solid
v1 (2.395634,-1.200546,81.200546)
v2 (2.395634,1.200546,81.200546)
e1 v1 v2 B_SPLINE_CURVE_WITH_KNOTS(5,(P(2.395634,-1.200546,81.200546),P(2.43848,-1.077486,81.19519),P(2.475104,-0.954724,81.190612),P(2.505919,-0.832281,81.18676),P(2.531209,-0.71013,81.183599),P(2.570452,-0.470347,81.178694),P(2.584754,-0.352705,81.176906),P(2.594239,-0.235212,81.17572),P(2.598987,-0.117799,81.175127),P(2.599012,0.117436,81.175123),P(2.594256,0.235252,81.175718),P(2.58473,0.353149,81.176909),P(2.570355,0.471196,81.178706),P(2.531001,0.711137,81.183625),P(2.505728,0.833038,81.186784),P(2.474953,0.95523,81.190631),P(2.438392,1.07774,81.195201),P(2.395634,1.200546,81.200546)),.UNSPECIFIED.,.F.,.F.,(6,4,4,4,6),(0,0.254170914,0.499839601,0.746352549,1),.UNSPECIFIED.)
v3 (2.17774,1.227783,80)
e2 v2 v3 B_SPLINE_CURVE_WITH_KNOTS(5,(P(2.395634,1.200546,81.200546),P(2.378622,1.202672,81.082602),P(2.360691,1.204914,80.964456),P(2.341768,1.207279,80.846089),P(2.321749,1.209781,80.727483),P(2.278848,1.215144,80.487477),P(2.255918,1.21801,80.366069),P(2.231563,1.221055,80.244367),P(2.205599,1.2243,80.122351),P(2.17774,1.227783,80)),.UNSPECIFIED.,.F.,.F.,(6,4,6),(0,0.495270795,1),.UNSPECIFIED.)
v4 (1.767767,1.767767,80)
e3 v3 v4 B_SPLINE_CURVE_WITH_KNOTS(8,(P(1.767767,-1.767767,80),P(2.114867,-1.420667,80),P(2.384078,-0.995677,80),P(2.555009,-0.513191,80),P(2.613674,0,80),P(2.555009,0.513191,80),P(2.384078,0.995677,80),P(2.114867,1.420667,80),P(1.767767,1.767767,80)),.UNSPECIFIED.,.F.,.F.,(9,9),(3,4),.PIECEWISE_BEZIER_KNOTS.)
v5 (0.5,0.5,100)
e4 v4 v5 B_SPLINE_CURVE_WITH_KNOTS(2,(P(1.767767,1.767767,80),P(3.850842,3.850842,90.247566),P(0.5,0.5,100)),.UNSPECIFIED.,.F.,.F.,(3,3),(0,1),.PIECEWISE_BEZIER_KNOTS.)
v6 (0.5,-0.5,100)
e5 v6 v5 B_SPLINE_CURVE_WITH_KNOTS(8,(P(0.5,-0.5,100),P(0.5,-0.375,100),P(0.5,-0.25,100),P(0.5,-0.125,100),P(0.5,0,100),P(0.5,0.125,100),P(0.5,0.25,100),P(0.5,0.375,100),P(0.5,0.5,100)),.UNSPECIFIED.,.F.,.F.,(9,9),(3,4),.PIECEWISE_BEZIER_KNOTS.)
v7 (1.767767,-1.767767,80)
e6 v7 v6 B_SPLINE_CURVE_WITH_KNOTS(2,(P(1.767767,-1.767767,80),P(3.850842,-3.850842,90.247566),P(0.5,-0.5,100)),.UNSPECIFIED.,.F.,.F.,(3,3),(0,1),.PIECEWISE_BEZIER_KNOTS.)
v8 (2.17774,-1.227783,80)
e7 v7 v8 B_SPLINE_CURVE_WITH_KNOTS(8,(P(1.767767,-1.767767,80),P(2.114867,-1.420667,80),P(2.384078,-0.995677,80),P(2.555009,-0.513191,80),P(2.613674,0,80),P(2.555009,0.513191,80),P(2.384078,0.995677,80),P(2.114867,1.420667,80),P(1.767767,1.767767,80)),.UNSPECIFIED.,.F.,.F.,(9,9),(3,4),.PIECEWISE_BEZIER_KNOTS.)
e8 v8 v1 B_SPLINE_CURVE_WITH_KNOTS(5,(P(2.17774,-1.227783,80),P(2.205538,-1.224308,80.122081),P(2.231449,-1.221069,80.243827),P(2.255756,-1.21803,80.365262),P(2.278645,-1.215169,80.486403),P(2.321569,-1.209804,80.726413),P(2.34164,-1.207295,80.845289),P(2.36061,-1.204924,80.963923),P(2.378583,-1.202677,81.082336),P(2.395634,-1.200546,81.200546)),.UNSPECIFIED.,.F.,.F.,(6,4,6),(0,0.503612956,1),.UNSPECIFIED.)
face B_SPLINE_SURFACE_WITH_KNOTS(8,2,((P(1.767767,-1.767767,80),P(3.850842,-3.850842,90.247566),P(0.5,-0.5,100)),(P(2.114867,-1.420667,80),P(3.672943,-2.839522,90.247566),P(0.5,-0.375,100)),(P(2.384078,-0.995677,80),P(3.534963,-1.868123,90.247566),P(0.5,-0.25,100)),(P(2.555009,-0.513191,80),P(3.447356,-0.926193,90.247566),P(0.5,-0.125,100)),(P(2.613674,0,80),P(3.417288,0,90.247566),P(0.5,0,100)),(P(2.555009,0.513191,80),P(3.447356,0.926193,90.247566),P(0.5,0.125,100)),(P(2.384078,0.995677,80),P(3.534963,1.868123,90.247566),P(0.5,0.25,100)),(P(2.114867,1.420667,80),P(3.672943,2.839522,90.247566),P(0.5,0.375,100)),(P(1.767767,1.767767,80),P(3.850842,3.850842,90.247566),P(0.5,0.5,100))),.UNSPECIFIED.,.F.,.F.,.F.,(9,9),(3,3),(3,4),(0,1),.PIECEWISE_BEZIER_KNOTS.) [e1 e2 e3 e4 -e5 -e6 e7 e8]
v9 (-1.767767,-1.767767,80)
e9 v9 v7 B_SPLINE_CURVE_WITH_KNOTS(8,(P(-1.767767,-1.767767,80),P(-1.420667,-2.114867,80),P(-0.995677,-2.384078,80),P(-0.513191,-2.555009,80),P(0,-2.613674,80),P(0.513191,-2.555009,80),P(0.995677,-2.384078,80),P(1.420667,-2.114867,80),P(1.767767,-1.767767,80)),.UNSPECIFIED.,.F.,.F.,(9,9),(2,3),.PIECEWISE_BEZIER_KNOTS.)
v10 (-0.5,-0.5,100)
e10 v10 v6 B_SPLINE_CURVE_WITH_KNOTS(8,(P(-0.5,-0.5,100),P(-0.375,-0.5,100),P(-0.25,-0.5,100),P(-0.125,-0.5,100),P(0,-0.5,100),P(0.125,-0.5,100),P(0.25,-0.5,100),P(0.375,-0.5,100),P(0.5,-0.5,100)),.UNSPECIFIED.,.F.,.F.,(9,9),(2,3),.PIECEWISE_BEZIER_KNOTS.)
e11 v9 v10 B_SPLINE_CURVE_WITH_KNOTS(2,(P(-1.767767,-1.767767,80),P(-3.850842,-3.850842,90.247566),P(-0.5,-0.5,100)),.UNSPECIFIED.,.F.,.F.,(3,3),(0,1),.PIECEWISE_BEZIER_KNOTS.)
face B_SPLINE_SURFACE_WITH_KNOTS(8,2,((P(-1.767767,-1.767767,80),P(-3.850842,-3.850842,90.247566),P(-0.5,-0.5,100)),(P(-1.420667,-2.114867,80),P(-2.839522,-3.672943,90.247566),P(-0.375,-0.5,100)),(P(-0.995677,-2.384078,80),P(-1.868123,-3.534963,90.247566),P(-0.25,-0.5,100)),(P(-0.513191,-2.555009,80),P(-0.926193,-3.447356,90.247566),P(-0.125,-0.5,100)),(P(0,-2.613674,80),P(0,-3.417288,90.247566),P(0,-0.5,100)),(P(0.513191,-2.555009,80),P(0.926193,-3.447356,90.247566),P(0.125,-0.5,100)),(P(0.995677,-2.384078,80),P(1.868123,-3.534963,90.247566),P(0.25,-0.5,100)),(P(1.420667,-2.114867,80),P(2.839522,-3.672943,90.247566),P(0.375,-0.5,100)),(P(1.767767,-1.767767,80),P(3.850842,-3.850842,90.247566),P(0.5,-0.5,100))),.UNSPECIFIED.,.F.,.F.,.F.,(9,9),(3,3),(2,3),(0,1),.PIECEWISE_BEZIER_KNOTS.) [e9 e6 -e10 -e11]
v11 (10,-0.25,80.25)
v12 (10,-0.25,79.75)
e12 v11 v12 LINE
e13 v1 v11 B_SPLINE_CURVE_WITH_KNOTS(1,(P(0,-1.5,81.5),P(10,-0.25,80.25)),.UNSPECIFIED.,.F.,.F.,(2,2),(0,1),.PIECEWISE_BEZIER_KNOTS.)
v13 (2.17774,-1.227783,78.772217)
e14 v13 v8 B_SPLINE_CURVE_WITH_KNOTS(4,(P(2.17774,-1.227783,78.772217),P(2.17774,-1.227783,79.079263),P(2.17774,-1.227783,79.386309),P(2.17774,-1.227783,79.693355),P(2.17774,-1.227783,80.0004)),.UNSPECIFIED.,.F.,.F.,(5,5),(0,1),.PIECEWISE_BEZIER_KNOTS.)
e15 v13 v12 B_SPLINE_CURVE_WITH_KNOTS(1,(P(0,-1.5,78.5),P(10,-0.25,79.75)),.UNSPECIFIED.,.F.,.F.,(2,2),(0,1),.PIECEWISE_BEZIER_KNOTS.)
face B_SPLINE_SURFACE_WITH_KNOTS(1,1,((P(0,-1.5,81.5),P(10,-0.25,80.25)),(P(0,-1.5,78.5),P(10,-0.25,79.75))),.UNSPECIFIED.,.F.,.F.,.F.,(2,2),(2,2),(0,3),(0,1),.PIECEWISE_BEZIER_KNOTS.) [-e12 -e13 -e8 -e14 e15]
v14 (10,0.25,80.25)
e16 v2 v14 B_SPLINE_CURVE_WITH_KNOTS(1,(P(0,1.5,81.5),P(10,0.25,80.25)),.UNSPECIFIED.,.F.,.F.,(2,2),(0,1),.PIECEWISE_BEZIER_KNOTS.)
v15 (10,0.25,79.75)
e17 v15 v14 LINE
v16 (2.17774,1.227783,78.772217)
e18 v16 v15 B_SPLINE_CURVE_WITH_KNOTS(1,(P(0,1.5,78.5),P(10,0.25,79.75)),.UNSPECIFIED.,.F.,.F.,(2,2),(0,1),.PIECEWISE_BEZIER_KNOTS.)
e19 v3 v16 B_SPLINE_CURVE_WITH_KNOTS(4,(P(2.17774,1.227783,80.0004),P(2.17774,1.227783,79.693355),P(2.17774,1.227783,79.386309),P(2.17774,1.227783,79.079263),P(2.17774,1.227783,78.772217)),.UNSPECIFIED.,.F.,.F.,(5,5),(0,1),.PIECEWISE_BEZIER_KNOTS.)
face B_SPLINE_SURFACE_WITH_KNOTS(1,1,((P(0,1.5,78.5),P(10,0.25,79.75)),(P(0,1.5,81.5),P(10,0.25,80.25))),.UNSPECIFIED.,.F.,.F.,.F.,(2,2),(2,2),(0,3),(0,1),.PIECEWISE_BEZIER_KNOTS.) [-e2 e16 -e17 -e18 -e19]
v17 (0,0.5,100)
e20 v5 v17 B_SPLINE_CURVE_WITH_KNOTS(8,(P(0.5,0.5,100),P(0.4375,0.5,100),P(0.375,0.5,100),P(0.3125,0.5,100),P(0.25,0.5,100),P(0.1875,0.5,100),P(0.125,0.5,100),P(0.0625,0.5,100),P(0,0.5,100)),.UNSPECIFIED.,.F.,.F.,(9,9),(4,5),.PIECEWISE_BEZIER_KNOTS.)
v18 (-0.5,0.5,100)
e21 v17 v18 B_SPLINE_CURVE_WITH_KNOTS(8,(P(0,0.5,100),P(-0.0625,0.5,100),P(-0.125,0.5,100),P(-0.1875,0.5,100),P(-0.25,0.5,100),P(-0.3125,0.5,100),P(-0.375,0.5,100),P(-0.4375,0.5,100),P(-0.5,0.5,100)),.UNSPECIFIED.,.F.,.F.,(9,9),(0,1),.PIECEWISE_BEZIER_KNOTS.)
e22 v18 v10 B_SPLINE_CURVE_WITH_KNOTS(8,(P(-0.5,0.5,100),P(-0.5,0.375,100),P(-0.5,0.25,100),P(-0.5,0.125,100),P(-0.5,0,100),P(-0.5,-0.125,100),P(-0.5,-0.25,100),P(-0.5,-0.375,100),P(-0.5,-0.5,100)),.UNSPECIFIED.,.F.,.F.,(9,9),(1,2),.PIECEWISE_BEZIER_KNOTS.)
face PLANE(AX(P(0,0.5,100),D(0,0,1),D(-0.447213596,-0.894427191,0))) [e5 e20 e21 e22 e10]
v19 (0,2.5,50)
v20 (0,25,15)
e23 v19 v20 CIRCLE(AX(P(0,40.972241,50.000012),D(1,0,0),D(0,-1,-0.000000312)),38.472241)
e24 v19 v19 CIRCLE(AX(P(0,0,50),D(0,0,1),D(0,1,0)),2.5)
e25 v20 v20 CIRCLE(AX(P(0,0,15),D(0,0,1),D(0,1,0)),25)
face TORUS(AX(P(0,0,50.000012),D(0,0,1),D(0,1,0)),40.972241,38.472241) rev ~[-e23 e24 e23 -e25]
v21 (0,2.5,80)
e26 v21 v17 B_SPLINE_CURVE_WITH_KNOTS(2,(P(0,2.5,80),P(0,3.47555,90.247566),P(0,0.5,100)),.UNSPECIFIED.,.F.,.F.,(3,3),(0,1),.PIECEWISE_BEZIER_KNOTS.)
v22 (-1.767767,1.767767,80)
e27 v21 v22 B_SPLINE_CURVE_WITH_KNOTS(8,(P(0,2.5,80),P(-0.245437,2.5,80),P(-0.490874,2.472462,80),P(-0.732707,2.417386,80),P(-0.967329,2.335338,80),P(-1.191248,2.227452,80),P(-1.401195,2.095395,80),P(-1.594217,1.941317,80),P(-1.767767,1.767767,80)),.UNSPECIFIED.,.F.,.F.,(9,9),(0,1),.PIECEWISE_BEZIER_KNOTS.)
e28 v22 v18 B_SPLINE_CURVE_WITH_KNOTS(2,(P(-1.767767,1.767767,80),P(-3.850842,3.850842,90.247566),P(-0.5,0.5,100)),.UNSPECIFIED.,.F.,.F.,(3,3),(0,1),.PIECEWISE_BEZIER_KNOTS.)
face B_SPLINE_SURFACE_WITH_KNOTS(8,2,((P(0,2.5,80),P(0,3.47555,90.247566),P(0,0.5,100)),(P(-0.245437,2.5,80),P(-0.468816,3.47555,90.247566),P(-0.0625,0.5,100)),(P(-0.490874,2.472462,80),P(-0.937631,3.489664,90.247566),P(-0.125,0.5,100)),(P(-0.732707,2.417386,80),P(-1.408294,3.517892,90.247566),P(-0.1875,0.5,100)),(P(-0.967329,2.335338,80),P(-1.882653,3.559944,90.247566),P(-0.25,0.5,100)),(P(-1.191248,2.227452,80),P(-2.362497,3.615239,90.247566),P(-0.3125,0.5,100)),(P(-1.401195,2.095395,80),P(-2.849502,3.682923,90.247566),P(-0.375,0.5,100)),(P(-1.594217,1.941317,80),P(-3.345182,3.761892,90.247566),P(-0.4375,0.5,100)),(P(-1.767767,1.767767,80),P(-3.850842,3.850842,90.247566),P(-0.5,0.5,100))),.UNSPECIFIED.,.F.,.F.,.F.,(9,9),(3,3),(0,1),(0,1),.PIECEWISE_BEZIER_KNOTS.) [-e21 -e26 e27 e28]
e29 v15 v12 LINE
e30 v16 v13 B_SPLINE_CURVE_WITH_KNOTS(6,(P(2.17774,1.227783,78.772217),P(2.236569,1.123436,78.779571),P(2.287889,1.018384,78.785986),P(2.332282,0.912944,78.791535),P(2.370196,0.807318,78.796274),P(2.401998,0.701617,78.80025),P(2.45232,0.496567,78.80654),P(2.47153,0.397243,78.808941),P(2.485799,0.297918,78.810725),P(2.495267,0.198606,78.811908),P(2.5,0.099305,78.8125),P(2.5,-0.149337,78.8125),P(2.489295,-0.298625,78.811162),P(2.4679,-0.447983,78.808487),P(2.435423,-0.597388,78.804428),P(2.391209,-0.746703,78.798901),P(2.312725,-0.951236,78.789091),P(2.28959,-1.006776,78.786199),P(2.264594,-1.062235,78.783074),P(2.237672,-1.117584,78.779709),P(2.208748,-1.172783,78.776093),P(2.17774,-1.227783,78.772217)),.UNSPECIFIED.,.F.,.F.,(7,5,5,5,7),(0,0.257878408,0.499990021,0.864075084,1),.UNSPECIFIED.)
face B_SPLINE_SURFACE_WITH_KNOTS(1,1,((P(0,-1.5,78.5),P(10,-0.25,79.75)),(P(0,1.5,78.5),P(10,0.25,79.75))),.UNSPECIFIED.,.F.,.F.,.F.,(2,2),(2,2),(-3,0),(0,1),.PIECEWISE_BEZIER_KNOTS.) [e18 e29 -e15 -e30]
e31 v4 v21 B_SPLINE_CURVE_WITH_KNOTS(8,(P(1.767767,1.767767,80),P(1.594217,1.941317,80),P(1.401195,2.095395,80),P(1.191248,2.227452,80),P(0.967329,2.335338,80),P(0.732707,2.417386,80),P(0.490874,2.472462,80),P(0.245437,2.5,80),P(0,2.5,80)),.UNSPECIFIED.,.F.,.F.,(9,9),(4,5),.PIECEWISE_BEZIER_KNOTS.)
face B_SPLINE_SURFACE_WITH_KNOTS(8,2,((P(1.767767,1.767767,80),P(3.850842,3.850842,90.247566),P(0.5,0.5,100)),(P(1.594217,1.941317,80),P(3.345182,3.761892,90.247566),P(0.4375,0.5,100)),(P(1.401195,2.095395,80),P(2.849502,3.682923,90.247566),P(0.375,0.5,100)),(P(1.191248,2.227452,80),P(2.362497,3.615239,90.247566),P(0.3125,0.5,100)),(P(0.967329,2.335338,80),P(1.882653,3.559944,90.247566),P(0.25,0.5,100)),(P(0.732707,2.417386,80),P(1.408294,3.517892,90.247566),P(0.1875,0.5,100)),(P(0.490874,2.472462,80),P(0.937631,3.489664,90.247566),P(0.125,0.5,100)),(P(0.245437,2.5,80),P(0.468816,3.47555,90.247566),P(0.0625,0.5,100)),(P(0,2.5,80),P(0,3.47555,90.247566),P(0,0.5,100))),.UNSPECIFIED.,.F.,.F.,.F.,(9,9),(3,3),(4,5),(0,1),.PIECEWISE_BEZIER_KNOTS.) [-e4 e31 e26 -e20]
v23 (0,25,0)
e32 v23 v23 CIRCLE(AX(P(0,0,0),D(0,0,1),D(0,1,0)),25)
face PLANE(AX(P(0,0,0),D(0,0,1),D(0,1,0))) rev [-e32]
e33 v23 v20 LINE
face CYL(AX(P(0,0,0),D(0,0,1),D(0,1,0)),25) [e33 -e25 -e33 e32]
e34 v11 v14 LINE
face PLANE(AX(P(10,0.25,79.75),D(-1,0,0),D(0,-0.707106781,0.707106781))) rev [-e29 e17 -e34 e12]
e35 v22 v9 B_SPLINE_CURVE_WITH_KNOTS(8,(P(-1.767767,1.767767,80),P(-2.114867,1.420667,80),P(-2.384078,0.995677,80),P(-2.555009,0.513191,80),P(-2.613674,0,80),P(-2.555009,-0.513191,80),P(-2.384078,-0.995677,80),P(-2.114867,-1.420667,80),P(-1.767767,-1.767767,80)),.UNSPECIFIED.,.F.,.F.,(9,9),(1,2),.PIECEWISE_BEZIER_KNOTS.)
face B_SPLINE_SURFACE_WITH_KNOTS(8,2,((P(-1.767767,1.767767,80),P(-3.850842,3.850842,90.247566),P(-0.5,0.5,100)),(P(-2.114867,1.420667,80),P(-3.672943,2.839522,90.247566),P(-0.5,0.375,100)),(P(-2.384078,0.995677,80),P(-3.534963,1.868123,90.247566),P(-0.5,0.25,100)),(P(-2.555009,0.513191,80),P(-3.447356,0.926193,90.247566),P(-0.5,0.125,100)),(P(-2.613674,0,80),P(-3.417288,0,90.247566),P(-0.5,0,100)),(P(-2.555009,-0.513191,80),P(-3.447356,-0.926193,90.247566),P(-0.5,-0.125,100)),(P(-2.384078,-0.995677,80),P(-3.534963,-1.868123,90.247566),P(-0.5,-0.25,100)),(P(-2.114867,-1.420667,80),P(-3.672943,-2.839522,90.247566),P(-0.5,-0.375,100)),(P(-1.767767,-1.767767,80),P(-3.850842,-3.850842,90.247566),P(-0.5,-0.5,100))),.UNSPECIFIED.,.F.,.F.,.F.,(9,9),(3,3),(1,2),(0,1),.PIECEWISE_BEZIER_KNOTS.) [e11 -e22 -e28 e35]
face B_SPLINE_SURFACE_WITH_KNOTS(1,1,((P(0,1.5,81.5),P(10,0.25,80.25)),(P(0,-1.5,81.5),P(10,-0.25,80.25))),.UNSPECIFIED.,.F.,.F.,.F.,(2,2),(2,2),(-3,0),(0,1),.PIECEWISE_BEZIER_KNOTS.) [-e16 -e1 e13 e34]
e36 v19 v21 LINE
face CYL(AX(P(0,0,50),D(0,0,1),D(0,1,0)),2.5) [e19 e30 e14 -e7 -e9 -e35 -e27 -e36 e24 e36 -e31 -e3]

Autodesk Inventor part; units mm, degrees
sketch "Sketch1" plane through (0, 0, 0) normal (1, 0, 0) x (0, 1, 0)
  line L0 (0, 0) -> (0, 80)
  line L1 (0, 0) -> (25, 0)
  line L2 (25, 0) -> (25, 15)
  line L3 (25, 15) -> (2.5, 15) construction
  line L4 (2.5, 15) -> (2.5, 50) construction
  line L5 (2.5, 80) -> (0, 80)
  arc A0 (2.5, 50) -> (25, 15) centre (40.9722, 50) ccw
  line L6 (2.5, 50) -> (2.5, 80)
  dimension "d0" = 50
  dimension "d1" = 80
  dimension "d2" = 15
  dimension "d3" = 5
  dimension "d4" = 35
revolve "Revolution1" add sketch "Sketch1" angle 360 about axis through (0, 0, 0) along (0, 0, 1)
ref_plane "Work Plane1" through (0, 0, 100) normal (0, 0, 1) x (1, 0, 0)
sketch "Sketch3" plane through (0, 0, 100) normal (0, 0, 1) x (1, 0, 0)
  line L0 (-0.5, -0.5) -> (0.5, -0.5)
  line L1 (0.5, -0.5) -> (0.5, 0.5)
  line L2 (0.5, 0.5) -> (-0.5, 0.5)
  line L3 (-0.5, 0.5) -> (-0.5, -0.5)
  line L4 (-0.5, -0.5) -> (0.5, 0.5) construction
  line L5 (0.5, -0.5) -> (-0.5, 0.5) construction
  point P0 (0, 0)
  dimension "d7" = 1
  dimension "d8" = 1
ref_plane "Work Plane2" through (0, 0, 90) normal (0, 0, 1) x (1, 0, 0)
sketch "Sketch4" plane through (0, 0, 90) normal (0, 0, 1) x (1, 0, 0)
  line L0 (-2.5, -2.5) -> (2.5, -2.5)
  line L1 (2.5, -2.5) -> (2.5, 2.5)
  line L2 (2.5, 2.5) -> (-2.5, 2.5)
  line L3 (-2.5, 2.5) -> (-2.5, -2.5)
  line L4 (-2.5, -2.5) -> (2.5, 2.5) construction
  line L5 (2.5, -2.5) -> (-2.5, 2.5) construction
  point P0 (0, 0)
  dimension "d10" = 5
  dimension "d11" = 5
loft "Loft1" add profiles "Sketch4", "Sketch3" section 1 edges at (0, -2.5, 80)
sketch "Sketch5" plane through (0, 0, 0) normal (1, 0, 0) x (0, 1, 0)
  line L0 (1.7678, 80) -> (1.7678, 80) projected
  line L1 (1.7678, 80) -> (-1.7678, 80) projected
  line L2 (-1.7678, 80) -> (-1.7678, 80) projected
  line L3 (-1.7678, 80) -> (1.7678, 80) projected
  line L4 (-2.5, 50) -> (2.5, 50) projected
  line L5 (-1.5, 81.5) -> (1.5, 81.5)
  line L6 (1.5, 81.5) -> (1.5, 78.5)
  line L7 (1.5, 78.5) -> (-1.5, 78.5)
  line L8 (-1.5, 78.5) -> (-1.5, 81.5)
  line L9 (-1.7678, 80) -> (1.7678, 80) projected
  line L10 (-1.5, 81.5) -> (1.5, 78.5) construction
  line L11 (1.5, 81.5) -> (-1.5, 78.5) construction
  point P0 (0, 0)
  point P1 (0, 80)
  dimension "d18" = 3
  dimension "d19" = 3
ref_plane "Work Plane3" through (10, 0, 0) normal (1, 0, 0) x (0, 1, 0)
sketch "Sketch6" plane through (10, 0, 0) normal (1, 0, 0) x (0, 1, 0)
  line L0 (1.7678, 80) -> (1.7678, 80) projected
  line L1 (1.7678, 80) -> (-2.5, 80) projected
  line L2 (-2.5, 80) -> (-1.7678, 80) projected
  line L3 (-1.7678, 80) -> (1.7678, 80) projected
  line L4 (-2.5, 50) -> (2.5, 50) projected
  line L5 (-0.25, 80.25) -> (0.25, 80.25)
  line L6 (0.25, 80.25) -> (0.25, 79.75)
  line L7 (0.25, 79.75) -> (-0.25, 79.75)
  line L8 (-0.25, 79.75) -> (-0.25, 80.25)
  line L9 (-2.5, 80) -> (1.7678, 80) projected
  line L10 (-0.25, 80.25) -> (0.25, 79.75) construction
  line L11 (0.25, 80.25) -> (-0.25, 79.75) construction
  point P0 (0, 0)
  point P1 (0, 80)
  dimension "d21" = 0.5
  dimension "d22" = 0.5
loft "Loft2" add profiles "Sketch5", "Sketch6"
properties part number "EndEffector"
